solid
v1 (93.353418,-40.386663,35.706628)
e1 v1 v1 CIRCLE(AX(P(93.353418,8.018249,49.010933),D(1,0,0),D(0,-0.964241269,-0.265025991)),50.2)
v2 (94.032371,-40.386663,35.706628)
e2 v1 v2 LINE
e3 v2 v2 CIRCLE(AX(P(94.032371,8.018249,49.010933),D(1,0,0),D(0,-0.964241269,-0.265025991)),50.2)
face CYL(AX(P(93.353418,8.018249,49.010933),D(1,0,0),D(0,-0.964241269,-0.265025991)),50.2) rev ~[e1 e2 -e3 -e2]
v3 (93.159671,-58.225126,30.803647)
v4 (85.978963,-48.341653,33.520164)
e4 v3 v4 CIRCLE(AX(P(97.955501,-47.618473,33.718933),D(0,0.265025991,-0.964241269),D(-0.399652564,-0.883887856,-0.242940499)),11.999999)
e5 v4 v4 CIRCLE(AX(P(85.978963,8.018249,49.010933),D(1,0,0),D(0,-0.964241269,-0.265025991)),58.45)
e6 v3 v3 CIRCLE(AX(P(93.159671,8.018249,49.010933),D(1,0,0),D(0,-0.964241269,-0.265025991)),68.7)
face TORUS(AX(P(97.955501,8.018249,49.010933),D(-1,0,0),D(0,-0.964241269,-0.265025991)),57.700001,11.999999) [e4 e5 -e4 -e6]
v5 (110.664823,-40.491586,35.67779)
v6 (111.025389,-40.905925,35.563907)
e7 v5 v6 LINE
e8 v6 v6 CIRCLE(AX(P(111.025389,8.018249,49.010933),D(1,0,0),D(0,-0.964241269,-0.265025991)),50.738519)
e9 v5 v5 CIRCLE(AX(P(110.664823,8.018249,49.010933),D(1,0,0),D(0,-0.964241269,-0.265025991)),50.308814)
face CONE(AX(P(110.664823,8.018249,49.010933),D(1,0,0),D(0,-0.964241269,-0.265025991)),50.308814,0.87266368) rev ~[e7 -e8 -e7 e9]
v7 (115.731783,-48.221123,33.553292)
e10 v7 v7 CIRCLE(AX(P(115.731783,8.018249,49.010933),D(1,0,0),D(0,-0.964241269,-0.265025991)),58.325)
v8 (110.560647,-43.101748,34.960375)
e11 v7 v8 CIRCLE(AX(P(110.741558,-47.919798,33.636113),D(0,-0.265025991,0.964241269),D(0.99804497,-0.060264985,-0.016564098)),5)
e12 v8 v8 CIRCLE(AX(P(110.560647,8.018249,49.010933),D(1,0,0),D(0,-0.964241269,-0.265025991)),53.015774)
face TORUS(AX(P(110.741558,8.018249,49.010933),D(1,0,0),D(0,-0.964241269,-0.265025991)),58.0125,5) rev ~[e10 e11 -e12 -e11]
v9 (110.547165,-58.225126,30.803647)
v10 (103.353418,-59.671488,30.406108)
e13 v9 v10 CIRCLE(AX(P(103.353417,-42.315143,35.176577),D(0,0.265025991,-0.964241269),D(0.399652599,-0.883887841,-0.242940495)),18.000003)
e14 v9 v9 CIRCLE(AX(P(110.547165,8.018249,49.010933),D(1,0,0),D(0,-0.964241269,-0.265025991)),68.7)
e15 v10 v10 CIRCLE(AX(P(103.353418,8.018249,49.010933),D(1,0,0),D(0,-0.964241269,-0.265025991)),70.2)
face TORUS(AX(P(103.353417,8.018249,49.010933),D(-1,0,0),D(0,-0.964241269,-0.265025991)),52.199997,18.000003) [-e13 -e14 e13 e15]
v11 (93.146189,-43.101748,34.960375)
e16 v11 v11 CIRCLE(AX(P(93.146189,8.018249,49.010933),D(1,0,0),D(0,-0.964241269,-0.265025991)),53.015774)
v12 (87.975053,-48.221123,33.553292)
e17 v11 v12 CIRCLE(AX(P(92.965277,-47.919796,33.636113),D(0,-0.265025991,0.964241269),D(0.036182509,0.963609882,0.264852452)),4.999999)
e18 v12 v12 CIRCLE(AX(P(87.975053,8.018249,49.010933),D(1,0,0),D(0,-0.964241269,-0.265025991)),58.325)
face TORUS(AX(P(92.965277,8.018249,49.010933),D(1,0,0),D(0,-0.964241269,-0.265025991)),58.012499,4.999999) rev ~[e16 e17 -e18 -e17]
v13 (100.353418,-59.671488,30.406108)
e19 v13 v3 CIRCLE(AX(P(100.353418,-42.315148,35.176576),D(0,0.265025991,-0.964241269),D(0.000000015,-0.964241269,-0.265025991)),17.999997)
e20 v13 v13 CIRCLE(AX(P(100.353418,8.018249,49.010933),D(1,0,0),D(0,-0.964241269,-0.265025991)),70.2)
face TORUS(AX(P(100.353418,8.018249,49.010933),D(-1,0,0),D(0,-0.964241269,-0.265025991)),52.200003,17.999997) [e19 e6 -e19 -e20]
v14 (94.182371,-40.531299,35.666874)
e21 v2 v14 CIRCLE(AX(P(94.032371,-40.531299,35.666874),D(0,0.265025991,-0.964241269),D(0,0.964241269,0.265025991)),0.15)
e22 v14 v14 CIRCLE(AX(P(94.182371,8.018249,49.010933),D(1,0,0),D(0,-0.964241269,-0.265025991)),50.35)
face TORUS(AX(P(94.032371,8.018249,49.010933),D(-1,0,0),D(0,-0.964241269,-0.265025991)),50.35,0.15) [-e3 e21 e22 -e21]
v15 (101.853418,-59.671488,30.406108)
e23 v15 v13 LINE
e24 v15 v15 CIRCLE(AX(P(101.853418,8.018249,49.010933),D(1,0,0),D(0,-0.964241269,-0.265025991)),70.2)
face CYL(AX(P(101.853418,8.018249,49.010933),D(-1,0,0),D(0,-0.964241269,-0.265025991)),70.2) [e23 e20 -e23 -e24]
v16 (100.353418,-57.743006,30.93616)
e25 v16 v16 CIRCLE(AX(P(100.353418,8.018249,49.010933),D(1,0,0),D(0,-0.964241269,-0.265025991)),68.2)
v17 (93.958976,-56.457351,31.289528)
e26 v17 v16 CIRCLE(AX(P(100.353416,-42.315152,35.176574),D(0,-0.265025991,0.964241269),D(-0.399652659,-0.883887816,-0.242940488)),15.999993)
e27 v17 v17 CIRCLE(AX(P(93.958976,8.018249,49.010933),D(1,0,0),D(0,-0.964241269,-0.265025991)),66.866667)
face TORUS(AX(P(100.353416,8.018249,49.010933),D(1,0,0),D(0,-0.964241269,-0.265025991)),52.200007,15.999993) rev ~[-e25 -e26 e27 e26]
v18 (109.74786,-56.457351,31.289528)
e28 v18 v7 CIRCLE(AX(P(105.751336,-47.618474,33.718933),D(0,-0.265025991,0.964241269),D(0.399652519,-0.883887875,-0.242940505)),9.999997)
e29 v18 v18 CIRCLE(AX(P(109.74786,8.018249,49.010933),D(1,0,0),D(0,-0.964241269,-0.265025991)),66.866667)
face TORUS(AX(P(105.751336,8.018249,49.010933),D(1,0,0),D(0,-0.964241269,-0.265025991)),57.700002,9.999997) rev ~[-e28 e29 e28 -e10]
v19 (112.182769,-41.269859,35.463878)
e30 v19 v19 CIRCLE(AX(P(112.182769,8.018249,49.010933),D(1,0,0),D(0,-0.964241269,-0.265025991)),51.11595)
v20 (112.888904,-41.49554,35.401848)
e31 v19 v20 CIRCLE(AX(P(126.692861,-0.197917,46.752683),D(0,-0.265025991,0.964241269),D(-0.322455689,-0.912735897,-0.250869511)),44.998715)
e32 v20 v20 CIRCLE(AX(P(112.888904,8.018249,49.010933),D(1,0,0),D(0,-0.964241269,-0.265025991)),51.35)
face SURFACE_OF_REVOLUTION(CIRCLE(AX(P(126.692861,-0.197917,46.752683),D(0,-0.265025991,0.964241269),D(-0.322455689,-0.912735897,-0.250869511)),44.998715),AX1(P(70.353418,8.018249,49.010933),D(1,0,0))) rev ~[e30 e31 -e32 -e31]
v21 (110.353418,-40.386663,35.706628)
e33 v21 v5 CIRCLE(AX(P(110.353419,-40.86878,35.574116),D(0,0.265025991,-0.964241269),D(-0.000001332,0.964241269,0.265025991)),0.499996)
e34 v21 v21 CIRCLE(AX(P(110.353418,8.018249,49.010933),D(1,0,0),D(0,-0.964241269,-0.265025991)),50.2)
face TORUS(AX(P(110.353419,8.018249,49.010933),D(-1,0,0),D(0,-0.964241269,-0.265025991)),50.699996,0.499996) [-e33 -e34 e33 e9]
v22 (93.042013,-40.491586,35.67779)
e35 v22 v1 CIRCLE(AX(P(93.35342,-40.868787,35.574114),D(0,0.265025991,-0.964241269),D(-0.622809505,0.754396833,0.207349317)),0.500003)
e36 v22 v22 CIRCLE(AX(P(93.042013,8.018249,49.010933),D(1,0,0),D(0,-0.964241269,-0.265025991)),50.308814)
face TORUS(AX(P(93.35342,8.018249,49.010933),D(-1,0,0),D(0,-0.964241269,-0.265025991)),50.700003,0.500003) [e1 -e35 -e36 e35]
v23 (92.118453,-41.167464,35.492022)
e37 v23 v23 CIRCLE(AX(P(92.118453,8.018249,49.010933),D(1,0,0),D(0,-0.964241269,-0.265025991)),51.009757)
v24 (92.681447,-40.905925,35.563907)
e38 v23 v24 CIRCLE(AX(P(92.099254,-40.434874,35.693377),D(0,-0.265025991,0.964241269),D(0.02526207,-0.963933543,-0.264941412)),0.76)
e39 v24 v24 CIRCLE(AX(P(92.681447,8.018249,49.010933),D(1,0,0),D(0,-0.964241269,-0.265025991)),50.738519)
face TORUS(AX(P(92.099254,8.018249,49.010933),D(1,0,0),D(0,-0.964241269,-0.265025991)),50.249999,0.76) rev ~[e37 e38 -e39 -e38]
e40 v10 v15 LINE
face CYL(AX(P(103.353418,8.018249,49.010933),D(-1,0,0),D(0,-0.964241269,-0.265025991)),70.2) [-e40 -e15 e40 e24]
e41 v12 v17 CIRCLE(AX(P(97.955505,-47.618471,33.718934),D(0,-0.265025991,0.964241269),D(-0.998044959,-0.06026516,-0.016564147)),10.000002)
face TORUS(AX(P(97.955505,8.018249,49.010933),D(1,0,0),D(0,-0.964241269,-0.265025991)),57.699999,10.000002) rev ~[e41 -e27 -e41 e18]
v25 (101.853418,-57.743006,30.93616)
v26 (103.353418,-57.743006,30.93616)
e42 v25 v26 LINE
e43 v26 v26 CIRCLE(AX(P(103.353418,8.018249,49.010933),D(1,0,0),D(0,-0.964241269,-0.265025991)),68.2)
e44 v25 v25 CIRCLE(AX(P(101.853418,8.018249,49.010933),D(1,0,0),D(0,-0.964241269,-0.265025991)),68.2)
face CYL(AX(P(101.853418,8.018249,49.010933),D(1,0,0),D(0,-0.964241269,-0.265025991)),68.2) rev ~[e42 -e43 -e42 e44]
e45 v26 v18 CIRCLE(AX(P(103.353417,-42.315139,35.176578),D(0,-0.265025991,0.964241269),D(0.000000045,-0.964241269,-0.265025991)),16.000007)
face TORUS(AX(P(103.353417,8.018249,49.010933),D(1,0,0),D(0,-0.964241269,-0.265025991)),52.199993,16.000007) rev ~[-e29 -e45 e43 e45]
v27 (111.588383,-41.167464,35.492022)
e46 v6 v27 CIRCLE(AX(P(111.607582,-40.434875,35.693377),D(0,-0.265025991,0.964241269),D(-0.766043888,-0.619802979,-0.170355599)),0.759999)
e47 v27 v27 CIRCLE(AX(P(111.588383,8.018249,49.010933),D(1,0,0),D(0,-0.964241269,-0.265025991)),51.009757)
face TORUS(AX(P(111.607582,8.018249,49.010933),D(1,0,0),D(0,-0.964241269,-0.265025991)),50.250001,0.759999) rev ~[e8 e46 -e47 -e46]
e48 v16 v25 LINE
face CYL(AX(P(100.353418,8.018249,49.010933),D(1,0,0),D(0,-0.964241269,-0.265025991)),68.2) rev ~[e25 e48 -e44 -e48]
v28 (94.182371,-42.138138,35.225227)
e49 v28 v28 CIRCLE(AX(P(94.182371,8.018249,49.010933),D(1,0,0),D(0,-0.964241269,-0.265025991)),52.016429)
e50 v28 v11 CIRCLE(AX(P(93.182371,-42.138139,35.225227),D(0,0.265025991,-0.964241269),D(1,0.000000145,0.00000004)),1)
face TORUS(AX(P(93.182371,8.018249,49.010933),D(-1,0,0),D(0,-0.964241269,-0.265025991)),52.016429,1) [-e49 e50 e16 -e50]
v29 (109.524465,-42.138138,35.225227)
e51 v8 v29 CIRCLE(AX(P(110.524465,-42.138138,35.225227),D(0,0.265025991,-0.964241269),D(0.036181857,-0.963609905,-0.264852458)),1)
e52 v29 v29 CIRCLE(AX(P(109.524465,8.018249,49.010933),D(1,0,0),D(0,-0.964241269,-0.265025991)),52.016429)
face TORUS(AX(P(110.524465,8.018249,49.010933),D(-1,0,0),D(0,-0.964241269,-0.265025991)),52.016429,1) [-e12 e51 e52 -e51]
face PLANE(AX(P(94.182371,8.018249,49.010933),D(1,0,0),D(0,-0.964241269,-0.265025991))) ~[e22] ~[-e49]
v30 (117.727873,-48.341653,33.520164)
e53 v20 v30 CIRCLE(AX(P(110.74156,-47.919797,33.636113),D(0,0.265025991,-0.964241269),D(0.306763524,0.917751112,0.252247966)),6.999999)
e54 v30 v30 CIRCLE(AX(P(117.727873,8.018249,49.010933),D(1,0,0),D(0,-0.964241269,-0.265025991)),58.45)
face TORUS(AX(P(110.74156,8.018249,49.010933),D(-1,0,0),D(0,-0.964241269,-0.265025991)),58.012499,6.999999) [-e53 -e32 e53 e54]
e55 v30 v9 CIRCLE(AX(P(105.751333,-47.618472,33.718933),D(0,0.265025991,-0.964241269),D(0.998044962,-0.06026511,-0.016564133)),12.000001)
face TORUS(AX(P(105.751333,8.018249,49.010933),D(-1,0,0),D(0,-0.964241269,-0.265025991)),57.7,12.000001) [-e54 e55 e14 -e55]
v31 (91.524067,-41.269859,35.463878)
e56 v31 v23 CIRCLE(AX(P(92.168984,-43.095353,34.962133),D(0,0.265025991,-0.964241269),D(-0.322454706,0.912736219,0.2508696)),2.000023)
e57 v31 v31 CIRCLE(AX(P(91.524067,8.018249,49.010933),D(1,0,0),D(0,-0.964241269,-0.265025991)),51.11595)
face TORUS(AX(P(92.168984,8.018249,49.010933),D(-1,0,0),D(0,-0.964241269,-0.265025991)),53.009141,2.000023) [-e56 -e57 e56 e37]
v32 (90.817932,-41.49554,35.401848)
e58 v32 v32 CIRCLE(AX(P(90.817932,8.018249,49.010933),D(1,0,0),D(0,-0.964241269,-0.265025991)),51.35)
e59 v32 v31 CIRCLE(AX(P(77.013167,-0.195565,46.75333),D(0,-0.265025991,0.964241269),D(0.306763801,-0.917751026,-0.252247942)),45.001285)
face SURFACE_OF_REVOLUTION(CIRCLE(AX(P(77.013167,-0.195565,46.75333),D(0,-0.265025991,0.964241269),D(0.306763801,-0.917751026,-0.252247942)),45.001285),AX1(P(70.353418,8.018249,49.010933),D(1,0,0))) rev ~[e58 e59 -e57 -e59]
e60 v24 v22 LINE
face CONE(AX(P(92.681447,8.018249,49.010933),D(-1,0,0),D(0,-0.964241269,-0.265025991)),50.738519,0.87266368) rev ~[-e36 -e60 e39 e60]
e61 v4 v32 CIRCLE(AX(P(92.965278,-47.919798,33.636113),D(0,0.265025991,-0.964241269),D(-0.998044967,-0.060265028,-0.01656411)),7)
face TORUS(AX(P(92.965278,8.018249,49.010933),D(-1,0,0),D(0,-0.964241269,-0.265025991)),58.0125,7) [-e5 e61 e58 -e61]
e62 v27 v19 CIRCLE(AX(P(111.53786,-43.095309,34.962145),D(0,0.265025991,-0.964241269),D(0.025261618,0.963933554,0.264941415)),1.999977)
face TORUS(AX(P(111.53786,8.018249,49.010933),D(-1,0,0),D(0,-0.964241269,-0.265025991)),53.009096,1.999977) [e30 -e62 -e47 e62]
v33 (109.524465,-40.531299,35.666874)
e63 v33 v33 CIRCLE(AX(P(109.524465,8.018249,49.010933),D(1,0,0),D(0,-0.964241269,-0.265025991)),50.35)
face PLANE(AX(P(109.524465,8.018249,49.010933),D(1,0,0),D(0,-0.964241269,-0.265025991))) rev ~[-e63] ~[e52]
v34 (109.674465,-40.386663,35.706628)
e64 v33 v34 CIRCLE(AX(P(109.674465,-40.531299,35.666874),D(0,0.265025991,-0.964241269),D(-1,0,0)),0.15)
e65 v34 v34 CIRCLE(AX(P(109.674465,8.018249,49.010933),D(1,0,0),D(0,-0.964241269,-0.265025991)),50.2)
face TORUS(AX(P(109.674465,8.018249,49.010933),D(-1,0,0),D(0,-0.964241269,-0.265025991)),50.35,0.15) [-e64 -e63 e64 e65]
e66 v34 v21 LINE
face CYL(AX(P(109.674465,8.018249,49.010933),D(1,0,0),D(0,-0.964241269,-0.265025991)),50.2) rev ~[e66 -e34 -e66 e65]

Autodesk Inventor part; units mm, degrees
ref_plane "YZ Plane" through (0, 0, 0) normal (1, 0, 0) x (0, 1, 0)
ref_plane "XZ Plane" through (0, 0, 0) normal (0, 1, 0) x (-1, 0, 0)
ref_plane "Płaszczyzna konstrukcyjna3" through (101.853418, 8.018249, 49.010933) normal (0, 0.265026, -0.9642413) x (1, 0, 0)
sketch "Szkic4" plane through (101.853418, 8.018249, 49.010933) normal (0, 0.265026, -0.9642413) x (1, 0, 0)
  line L0 (-12.35, 51) -> (-9.754164, 51) construction
  line L1 (-9.179631, 50.732091) -> (-8.883022, 50.378606) construction
  line L2 (-8.5, 50.2) -> (-6.875, 50.2) construction
  arc A0 (-8.883022, 50.378606) -> (-8.5, 50.2) centre (-8.5, 50.7) ccw construction
  arc A1 (-9.179631, 50.732091) -> (-9.754164, 51) centre (-9.754164, 50.25) ccw construction
  line L3 (-9.171971, 50.738519) -> (-8.811405, 50.308814)
  arc A2 (-9.171971, 50.738519) -> (-9.734965, 51.009757) centre (-9.754164, 50.25) ccw
  arc A3 (-10.329351, 51.11595) -> (-9.734965, 51.009757) centre (-9.68444, 53.009119) ccw
  arc A4 (-10.329351, 51.11595) -> (-11.035486, 51.35) centre (-24.839852, 8.519643) ccw
  arc A5 (-15.874455, 58.45) -> (-11.035486, 51.35) centre (-8.888141, 58.0125) ccw
  arc A6 (-8.693747, 68.7) -> (-15.874455, 58.45) centre (-3.897916, 57.7) ccw
  arc A7 (-1.5, 70.2) -> (-8.693747, 68.7) centre (-1.5, 52.2) ccw
  line L4 (-4.165584, 57.749949) -> (4.277424, 57.749949) construction
  line L5 (-1.5, 70.2) -> (0, 70.2)
  arc A8 (-8.811405, 50.308814) -> (-8.5, 50.2) centre (-8.5, 50.7) ccw
  line L6 (-8.5, 50.2) -> (-7.821047, 50.2)
  arc A9 (-7.821047, 50.2) -> (-7.671047, 50.35) centre (-7.821047, 50.35) ccw
  line L7 (-7.671047, 50.35) -> (-7.671047, 52.016429)
  arc A10 (-7.671047, 52.016429) -> (-8.707229, 53.015774) centre (-8.671047, 52.016429) ccw
  line L8 (-8.47801, 50.43531) -> (-8.5, 50.43531)
  arc A11 (-9.684439, 53.009099) -> (-9.684441, 53.009099) centre (-9.68444, 53.009119) ccw
  arc A12 (-13.878365, 58.325) -> (-8.707229, 53.015774) centre (-8.888141, 58.0125) ccw
  arc A13 (-7.894442, 66.866667) -> (-13.878365, 58.325) centre (-3.897916, 57.7) ccw
  arc A14 (-1.5, 68.2) -> (-7.894442, 66.866667) centre (-1.5, 52.2) ccw
  line L9 (-1.5, 68.2) -> (0, 68.2)
  line L10 (-12.5, -50.85) -> (-12.5, 50.85) construction
  line L11 (12.5, -50.85) -> (12.5, 50.85) construction
  line L12 (37.5, 47.263297) -> (37.5, 53.920969) construction
  line L13 (-37.5, 51.183214) -> (-37.5, 44.81995) construction
  line L14 (0, 70.947992) -> (0, 46.303819) construction
  line L15 (12.35, 51) -> (9.754164, 51) construction
  line L16 (9.179631, 50.732091) -> (8.883022, 50.378606) construction
  line L17 (8.5, 50.2) -> (6.875, 50.2) construction
  arc A15 (8.5, 50.2) -> (8.883022, 50.378606) centre (8.5, 50.7) ccw construction
  arc A16 (9.754164, 51) -> (9.179631, 50.732091) centre (9.754164, 50.25) ccw construction
  line L18 (9.171971, 50.738519) -> (8.811405, 50.308814)
  arc A17 (9.734965, 51.009757) -> (9.171971, 50.738519) centre (9.754164, 50.25) ccw
  arc A18 (9.734965, 51.009757) -> (10.329351, 51.11595) centre (9.68444, 53.009119) ccw
  arc A19 (11.035486, 51.35) -> (10.329351, 51.11595) centre (24.839852, 8.519643) ccw
  arc A20 (11.035486, 51.35) -> (15.874455, 58.45) centre (8.888141, 58.0125) ccw
  arc A21 (15.874455, 58.45) -> (8.693747, 68.7) centre (3.897916, 57.7) ccw
  arc A22 (8.693747, 68.7) -> (1.5, 70.2) centre (1.5, 52.2) ccw
  line L19 (1.5, 70.2) -> (0, 70.2)
  arc A23 (8.5, 50.2) -> (8.811405, 50.308814) centre (8.5, 50.7) ccw
  line L20 (8.5, 50.2) -> (7.821047, 50.2)
  arc A24 (7.671047, 50.35) -> (7.821047, 50.2) centre (7.821047, 50.35) ccw
  line L21 (7.671047, 50.35) -> (7.671047, 52.016429)
  arc A25 (8.707229, 53.015774) -> (7.671047, 52.016429) centre (8.671047, 52.016429) ccw
  line L22 (8.47801, 50.43531) -> (8.5, 50.43531)
  arc A26 (9.684441, 53.009099) -> (9.684439, 53.009099) centre (9.68444, 53.009119) ccw
  arc A27 (8.707229, 53.015774) -> (13.878365, 58.325) centre (8.888141, 58.0125) ccw
  arc A28 (13.878365, 58.325) -> (7.894442, 66.866667) centre (3.897916, 57.7) ccw
  arc A29 (7.894442, 66.866667) -> (1.5, 68.2) centre (1.5, 52.2) ccw
  line L23 (1.5, 68.2) -> (0, 68.2)
  line L24 (-31.5, 0) -> (31.5, 0) construction
  point P0 (4.165584, 57.749949)
  dimension "d0" = 0.01
  dimension "d1" = 20
  dimension "d2" = 2
  dimension "d3" = 18
  dimension "d4" = 12
  dimension "d5" = 7
  dimension "d6" = 2
  dimension "d7" = 0.76
  dimension "d8" = 0.5
  dimension "d9" = 0.15
  dimension "d11" = 1.5
  dimension "d12" = 11.75
  dimension "d13" = 1
  dimension "d15" = 2.81577
  dimension "d19" = 1.5
  dimension "d20" = 1.5
  dimension "d21" = 45
  dimension "d22" = 0.35
sketch "Szkic4 outline for Obrót1" plane through (101.853418, 8.018249, 49.010933) normal (0, 0.265026, -0.9642413) x (1, 0, 0)
  arc A0 (-9.734965, 51.009757) -> (-9.171971, 50.738519) centre (-9.754164, 50.25) cw
  arc A1 (-10.329351, 51.11595) -> (-9.734965, 51.009757) centre (-9.68444, 53.009119) ccw
  arc A2 (-11.035486, 51.35) -> (-10.329351, 51.11595) centre (-24.839852, 8.519643) cw
  arc A3 (-15.874455, 58.45) -> (-11.035486, 51.35) centre (-8.888141, 58.0125) ccw
  arc A4 (-8.693747, 68.7) -> (-15.874455, 58.45) centre (-3.897916, 57.7) ccw
  arc A5 (-1.5, 70.2) -> (-8.693747, 68.7) centre (-1.5, 52.2) ccw
  line L0 (0, 70.2) -> (-1.5, 70.2)
  line L1 (1.5, 70.2) -> (0, 70.2)
  arc A6 (8.693747, 68.7) -> (1.5, 70.2) centre (1.5, 52.2) ccw
  arc A7 (15.874455, 58.45) -> (8.693747, 68.7) centre (3.897916, 57.7) ccw
  arc A8 (11.035486, 51.35) -> (15.874455, 58.45) centre (8.888141, 58.0125) ccw
  arc A9 (10.329351, 51.11595) -> (11.035486, 51.35) centre (24.839852, 8.519643) cw
  arc A10 (9.734965, 51.009757) -> (10.329351, 51.11595) centre (9.68444, 53.009119) ccw
  arc A11 (9.171971, 50.738519) -> (9.734965, 51.009757) centre (9.754164, 50.25) cw
  line L2 (8.811405, 50.308814) -> (9.171971, 50.738519)
  arc A12 (8.5, 50.2) -> (8.811405, 50.308814) centre (8.5, 50.7) ccw
  line L3 (7.821047, 50.2) -> (8.5, 50.2)
  arc A13 (7.671047, 50.35) -> (7.821047, 50.2) centre (7.821047, 50.35) ccw
  line L4 (7.671047, 52.016429) -> (7.671047, 50.35)
  arc A14 (8.707229, 53.015774) -> (7.671047, 52.016429) centre (8.671047, 52.016429) ccw
  arc A15 (13.878365, 58.325) -> (8.707229, 53.015774) centre (8.888141, 58.0125) cw
  arc A16 (7.894442, 66.866667) -> (13.878365, 58.325) centre (3.897916, 57.7) cw
  arc A17 (1.5, 68.2) -> (7.894442, 66.866667) centre (1.5, 52.2) cw
  line L5 (0, 68.2) -> (1.5, 68.2)
  line L6 (-1.5, 68.2) -> (0, 68.2)
  arc A18 (-7.894442, 66.866667) -> (-1.5, 68.2) centre (-1.5, 52.2) cw
  arc A19 (-13.878365, 58.325) -> (-7.894442, 66.866667) centre (-3.897916, 57.7) cw
  arc A20 (-8.707229, 53.015774) -> (-13.878365, 58.325) centre (-8.888141, 58.0125) cw
  arc A21 (-7.671047, 52.016429) -> (-8.707229, 53.015774) centre (-8.671047, 52.016429) ccw
  line L7 (-7.671047, 50.35) -> (-7.671047, 52.016429)
  arc A22 (-7.821047, 50.2) -> (-7.671047, 50.35) centre (-7.821047, 50.35) ccw
  line L8 (-8.5, 50.2) -> (-7.821047, 50.2)
  arc A23 (-8.811405, 50.308814) -> (-8.5, 50.2) centre (-8.5, 50.7) ccw
  line L9 (-9.171971, 50.738519) -> (-8.811405, 50.308814)
revolve "Obrót1" add sketch "Szkic4 outline for Obrót1" angle 360 about axis through (70.353418, 8.018249, 49.010933) along (1, 0, 0)
properties part number "Opona_koła_przedniego" material "Kauczuk, silikon"
